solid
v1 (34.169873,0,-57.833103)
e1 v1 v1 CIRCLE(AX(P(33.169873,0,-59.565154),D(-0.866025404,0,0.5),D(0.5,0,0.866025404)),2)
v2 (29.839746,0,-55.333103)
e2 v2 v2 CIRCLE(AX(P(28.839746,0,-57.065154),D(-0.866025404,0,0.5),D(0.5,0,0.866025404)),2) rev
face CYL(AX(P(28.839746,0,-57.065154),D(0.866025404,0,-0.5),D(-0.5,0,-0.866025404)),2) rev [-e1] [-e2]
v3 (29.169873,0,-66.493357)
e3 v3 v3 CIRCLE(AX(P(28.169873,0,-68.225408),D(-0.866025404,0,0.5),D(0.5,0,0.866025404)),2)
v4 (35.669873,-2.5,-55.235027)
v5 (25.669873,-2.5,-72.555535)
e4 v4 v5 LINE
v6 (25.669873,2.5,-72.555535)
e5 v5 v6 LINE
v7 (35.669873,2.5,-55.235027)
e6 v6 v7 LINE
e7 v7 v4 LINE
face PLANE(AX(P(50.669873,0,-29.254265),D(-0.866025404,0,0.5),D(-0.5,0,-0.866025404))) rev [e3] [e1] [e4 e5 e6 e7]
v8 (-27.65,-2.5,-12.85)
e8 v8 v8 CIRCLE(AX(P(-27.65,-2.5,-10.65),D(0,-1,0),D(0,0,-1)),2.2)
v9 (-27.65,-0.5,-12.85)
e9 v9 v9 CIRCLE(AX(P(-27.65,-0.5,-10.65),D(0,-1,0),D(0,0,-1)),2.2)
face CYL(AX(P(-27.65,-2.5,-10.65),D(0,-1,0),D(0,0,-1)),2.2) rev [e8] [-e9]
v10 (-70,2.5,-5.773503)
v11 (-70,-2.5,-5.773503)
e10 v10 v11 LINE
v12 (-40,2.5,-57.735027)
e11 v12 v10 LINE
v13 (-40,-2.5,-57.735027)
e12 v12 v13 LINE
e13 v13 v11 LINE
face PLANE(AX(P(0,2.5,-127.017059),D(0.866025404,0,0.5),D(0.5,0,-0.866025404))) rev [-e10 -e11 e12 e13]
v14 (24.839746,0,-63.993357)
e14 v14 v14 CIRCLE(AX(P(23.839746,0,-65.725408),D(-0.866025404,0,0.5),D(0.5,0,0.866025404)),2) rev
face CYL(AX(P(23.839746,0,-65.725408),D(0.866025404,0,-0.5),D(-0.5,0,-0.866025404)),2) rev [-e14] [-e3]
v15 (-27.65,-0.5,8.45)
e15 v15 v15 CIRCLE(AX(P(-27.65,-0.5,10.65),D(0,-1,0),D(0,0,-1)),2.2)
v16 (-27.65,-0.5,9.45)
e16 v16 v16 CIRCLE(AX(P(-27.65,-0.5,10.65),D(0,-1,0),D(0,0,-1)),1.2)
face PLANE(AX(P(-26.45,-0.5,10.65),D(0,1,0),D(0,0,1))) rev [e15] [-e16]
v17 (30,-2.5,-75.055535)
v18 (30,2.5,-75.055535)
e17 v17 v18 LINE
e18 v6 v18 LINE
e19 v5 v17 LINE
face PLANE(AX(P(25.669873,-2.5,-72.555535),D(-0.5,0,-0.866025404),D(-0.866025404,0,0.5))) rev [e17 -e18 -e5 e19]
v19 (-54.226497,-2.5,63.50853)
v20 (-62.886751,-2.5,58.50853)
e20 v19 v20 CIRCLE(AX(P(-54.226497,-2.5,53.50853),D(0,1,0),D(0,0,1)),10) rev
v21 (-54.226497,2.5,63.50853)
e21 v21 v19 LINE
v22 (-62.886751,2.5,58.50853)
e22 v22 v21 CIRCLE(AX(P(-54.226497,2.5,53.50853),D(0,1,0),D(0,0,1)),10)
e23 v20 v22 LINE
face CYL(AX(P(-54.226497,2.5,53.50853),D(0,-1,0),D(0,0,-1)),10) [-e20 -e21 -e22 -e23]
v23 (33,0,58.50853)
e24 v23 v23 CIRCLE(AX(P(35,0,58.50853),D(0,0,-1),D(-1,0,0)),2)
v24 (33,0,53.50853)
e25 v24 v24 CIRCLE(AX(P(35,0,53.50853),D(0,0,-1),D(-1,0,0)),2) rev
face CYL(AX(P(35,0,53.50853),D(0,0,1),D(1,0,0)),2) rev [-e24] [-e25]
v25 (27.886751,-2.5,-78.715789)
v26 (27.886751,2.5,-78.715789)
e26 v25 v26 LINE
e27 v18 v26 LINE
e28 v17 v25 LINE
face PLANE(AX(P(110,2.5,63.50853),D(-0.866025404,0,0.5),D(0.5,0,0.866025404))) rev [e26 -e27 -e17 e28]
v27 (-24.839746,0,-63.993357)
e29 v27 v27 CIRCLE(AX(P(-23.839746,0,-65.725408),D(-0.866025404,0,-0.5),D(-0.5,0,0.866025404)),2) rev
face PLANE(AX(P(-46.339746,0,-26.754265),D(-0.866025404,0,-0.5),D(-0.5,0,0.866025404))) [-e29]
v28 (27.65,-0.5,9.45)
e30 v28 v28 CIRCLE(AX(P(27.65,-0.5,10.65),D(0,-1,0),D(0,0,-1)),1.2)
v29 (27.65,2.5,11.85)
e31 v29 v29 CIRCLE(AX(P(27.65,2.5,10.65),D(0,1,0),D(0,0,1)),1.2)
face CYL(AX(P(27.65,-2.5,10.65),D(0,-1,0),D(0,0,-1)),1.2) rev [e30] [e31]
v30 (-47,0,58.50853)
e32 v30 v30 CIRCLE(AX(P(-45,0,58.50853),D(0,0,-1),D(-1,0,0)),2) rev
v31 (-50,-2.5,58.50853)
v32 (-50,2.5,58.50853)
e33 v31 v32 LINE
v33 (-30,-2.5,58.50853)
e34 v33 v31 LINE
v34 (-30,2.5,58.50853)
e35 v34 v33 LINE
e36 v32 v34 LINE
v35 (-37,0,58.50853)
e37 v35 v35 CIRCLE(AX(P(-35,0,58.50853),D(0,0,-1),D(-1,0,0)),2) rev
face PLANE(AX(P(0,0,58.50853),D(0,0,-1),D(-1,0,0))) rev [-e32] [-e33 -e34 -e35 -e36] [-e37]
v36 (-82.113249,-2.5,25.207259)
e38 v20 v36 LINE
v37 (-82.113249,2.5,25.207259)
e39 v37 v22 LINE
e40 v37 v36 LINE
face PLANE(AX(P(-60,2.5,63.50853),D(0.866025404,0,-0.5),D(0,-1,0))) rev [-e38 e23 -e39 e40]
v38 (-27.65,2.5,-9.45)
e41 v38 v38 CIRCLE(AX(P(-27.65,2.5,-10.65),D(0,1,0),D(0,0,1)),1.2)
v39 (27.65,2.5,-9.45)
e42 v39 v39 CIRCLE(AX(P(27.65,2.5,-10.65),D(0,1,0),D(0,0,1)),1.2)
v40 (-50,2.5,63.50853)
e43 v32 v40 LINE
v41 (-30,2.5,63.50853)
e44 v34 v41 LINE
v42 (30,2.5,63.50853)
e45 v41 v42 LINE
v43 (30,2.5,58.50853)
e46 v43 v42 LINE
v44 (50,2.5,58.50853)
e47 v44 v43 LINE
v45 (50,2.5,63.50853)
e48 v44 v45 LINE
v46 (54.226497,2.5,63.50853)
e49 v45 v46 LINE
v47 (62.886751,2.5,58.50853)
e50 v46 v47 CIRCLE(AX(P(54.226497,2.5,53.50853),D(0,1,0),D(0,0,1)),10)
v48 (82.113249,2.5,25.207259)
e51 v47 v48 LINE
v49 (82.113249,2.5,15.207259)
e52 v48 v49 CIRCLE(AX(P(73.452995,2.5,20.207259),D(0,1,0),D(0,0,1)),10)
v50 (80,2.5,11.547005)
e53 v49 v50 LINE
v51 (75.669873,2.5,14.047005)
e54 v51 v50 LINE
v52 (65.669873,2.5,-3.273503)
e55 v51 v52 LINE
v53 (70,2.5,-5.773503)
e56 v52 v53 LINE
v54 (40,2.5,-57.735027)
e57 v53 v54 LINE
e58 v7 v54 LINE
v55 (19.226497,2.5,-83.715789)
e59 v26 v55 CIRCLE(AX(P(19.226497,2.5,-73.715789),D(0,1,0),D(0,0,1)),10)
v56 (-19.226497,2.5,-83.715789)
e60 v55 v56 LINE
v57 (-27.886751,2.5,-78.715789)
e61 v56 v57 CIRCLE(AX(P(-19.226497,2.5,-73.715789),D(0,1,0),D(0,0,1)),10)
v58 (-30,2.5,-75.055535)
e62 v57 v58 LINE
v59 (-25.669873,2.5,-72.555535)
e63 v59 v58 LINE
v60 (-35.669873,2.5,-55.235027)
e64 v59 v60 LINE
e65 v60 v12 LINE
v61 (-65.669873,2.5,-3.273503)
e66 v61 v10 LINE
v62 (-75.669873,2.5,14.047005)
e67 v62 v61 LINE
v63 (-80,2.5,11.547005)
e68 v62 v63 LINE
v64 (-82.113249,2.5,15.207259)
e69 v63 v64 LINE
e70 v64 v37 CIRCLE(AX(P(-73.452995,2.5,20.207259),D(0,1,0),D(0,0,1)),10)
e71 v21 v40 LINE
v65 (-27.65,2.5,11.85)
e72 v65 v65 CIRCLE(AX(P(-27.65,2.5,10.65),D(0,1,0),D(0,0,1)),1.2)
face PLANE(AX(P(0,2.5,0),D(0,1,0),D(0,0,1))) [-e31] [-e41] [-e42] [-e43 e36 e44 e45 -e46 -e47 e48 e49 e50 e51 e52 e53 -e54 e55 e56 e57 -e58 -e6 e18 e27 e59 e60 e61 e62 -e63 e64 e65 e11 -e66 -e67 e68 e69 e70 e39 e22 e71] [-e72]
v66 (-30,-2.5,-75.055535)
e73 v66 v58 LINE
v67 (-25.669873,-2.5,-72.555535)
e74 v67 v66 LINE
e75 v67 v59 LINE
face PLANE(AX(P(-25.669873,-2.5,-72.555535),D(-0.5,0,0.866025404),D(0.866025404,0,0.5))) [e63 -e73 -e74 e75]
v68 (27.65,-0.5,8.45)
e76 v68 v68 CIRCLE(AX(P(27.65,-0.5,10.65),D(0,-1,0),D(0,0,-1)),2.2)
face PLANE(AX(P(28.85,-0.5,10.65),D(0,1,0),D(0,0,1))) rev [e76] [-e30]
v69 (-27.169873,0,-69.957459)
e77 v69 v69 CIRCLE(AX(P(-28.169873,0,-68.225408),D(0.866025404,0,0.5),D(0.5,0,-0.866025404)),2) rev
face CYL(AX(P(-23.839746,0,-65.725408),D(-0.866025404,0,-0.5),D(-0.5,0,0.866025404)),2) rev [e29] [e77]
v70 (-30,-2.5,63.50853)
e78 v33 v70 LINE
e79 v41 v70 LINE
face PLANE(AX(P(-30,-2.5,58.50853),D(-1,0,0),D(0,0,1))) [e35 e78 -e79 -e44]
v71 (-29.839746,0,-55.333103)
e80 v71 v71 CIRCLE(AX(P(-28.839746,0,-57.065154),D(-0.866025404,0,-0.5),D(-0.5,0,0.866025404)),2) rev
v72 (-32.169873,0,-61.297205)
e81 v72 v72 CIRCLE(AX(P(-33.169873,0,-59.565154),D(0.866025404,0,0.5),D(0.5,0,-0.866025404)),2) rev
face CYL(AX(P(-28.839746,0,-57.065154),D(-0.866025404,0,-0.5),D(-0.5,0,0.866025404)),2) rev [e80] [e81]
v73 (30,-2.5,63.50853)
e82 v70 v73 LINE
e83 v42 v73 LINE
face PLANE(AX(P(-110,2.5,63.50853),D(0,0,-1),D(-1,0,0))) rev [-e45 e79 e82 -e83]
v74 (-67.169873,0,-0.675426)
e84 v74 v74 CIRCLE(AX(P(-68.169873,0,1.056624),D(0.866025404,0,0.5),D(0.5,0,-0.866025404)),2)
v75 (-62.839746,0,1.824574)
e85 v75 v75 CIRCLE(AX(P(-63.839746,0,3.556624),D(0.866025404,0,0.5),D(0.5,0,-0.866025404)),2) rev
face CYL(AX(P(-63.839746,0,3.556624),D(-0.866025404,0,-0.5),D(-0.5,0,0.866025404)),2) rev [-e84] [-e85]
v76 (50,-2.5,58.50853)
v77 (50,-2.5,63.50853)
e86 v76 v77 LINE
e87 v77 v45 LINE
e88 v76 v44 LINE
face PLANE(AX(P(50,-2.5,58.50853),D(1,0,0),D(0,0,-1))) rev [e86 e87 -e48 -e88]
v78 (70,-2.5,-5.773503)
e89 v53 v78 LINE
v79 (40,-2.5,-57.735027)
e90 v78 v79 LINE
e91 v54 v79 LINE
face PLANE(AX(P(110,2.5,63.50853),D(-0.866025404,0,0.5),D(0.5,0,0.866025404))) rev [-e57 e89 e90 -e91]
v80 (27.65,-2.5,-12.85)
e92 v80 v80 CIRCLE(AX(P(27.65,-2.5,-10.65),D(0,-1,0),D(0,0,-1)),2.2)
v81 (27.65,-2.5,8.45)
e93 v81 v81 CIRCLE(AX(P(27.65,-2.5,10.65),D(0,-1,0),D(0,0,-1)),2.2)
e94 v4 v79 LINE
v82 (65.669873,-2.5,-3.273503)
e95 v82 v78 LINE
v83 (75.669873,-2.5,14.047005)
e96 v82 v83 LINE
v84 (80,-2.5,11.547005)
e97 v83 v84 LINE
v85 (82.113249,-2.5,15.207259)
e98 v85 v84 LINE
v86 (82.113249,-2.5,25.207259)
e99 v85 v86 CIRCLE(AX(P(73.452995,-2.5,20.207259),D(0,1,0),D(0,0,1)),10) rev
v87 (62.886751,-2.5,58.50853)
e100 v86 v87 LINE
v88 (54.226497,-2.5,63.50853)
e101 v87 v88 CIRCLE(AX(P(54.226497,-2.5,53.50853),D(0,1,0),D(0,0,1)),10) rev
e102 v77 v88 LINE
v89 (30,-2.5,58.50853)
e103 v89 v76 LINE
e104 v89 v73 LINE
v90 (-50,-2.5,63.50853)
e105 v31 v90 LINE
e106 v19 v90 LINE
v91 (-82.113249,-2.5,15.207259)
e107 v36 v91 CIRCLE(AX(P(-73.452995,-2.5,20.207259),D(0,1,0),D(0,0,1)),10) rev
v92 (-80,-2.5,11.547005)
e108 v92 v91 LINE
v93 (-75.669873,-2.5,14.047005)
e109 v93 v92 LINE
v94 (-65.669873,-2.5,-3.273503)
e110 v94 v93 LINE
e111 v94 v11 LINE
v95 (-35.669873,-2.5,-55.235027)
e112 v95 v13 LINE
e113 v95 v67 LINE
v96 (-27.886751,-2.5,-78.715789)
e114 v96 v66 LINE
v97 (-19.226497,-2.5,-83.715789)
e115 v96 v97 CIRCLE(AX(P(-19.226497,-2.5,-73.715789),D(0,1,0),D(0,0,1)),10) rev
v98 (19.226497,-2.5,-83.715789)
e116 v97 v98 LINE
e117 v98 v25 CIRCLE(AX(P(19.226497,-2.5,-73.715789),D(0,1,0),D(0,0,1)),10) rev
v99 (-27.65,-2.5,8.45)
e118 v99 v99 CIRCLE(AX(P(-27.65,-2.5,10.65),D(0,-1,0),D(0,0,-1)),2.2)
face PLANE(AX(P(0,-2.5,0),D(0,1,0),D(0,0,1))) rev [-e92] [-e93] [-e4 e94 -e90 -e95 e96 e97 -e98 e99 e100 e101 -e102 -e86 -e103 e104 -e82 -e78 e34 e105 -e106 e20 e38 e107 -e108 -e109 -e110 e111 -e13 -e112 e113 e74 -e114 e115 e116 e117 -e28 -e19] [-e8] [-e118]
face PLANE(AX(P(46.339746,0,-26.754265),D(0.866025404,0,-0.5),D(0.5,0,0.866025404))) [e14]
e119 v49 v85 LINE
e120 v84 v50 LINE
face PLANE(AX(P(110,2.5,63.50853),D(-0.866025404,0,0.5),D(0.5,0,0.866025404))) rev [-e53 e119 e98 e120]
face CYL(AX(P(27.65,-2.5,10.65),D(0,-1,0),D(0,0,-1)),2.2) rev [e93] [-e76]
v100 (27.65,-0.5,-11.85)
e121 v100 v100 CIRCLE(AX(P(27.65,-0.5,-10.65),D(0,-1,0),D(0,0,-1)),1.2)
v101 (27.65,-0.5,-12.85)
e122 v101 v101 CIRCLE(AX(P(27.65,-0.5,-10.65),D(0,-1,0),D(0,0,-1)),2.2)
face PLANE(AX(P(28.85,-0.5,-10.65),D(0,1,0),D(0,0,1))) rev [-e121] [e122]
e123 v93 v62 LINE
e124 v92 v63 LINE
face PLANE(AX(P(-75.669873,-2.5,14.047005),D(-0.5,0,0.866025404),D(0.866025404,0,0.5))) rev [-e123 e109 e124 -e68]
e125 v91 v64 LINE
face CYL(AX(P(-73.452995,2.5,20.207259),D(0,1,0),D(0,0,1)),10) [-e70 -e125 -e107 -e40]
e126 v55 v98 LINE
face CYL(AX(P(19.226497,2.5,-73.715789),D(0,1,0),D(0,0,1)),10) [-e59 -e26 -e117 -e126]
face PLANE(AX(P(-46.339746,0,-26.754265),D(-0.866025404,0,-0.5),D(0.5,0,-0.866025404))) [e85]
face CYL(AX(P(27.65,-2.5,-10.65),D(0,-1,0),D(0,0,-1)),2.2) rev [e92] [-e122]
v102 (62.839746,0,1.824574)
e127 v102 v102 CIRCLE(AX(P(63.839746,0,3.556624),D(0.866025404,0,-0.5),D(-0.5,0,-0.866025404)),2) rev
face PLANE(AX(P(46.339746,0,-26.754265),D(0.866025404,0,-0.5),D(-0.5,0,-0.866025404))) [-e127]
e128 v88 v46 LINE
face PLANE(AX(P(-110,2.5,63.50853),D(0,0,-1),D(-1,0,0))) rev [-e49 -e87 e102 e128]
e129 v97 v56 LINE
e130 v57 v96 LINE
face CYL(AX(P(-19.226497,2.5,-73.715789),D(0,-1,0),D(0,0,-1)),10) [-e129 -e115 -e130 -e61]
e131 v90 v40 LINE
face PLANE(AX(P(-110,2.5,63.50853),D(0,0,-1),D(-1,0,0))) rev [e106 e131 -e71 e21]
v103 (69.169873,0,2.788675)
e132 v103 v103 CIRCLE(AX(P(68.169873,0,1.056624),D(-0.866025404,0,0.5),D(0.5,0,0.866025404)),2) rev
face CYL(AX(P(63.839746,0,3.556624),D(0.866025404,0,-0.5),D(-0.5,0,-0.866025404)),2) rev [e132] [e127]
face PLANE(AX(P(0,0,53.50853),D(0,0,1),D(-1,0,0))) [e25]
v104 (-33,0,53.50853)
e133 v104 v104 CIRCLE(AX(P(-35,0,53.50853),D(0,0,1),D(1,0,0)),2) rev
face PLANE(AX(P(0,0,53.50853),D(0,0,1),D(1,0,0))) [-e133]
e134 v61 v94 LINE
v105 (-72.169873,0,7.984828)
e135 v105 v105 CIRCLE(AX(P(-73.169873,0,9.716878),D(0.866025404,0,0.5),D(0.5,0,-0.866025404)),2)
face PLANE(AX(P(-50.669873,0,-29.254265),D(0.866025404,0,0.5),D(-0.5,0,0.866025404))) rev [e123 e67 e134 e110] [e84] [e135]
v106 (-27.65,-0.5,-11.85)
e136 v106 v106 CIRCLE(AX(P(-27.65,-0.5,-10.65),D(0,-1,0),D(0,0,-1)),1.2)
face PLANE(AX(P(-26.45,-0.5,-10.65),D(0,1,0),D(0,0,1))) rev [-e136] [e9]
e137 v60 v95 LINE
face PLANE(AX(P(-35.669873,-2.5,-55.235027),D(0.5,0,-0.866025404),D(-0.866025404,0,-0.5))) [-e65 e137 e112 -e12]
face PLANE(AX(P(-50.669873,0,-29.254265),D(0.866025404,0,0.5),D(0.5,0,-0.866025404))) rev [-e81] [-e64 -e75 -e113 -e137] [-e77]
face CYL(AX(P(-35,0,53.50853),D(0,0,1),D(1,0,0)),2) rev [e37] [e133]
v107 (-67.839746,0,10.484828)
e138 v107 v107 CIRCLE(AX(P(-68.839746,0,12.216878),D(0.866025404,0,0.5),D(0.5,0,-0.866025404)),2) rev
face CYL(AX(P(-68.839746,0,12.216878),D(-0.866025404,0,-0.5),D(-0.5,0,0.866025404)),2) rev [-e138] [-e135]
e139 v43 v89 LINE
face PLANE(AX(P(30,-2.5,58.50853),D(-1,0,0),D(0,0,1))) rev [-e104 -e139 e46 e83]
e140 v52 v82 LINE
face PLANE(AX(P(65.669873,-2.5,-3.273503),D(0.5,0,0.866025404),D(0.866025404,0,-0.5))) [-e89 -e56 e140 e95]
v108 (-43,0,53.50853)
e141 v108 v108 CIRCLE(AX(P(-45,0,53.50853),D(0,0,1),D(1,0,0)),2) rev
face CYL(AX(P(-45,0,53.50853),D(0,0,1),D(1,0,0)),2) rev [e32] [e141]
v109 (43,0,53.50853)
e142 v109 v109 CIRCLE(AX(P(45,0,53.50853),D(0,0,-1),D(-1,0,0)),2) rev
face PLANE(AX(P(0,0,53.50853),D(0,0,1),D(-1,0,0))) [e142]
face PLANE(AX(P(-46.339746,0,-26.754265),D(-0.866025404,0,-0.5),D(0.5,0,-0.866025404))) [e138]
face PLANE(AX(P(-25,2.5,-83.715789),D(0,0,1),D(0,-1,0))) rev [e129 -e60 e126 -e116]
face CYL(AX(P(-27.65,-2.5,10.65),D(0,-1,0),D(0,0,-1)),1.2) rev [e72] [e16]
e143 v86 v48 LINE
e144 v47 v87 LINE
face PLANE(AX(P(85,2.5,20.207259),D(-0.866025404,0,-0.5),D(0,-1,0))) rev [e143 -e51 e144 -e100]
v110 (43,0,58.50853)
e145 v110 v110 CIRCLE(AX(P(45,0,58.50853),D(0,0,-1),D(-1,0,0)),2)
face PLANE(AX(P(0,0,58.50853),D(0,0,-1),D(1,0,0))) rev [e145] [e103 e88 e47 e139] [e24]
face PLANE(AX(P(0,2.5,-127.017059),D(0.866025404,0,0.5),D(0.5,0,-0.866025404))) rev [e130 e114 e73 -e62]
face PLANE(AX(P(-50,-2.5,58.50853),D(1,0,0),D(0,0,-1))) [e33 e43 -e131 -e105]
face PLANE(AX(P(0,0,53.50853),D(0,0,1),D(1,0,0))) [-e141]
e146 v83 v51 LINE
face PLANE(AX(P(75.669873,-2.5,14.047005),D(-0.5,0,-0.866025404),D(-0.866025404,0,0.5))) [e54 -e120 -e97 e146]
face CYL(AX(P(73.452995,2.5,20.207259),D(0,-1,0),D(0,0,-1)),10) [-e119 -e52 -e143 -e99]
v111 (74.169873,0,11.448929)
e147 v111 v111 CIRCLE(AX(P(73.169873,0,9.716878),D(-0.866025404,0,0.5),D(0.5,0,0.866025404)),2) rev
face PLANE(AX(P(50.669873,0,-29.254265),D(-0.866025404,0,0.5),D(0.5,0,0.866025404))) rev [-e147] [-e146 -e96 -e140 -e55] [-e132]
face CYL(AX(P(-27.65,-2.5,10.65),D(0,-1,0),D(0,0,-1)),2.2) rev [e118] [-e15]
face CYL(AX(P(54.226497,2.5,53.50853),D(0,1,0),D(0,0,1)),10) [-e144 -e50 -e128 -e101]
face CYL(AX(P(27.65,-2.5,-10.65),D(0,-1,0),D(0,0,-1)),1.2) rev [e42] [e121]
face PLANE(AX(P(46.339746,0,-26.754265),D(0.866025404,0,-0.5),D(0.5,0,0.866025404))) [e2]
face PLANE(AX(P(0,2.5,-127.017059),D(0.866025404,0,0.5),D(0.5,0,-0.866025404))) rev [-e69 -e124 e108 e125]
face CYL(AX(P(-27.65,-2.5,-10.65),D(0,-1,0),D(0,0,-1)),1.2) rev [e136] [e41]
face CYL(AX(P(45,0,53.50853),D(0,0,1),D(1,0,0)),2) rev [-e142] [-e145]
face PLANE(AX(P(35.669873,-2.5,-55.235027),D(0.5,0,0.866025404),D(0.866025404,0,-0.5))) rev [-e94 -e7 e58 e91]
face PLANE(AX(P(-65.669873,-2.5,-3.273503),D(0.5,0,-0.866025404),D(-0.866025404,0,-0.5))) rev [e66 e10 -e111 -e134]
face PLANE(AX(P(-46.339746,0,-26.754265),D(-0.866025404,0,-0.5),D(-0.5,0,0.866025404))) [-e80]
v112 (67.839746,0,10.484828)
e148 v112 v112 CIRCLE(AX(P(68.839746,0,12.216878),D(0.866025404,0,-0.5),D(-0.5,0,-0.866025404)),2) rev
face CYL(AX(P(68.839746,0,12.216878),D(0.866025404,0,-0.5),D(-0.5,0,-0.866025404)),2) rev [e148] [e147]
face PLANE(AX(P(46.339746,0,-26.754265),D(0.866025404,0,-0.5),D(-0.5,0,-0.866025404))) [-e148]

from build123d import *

# Parameters (mm, degrees)
BOSS_EXTRUDE1_DEPTH            = 2.5
CHAMFER1_SIZE                  = 50
SKETCH4_W                      = 20
SKETCH4_H                      = 5
SKETCH4_R                      = 2
CUT_EXTRUDE1_DEPTH             = 5
SKETCH4_2_R                    = 2
CUT_EXTRUDE2_DEPTH             = 10
CRVPATTERN1_START              = -63.508529611
CRVPATTERN1_OUTLINE_W          = 20
CRVPATTERN1_OUTLINE_H          = 5
CRVPATTERN1_DEPTH              = 5
CRVPATTERN1_START_2            = -58.508529611
CRVPATTERN1_2_OUTLINE_R        = 2
CRVPATTERN1_2_DEPTH            = 5
CRVPATTERN1_START_3            = 58.508529611
CRVPATTERN1_3_OUTLINE_W        = 20
CRVPATTERN1_3_OUTLINE_H        = 5
CRVPATTERN1_3_DEPTH            = 5
CRVPATTERN1_START_4            = 53.508529611
CRVPATTERN1_4_OUTLINE_R        = 2
CRVPATTERN1_4_DEPTH            = 5
FILLET1_R                      = 10
CBORE_FOR_M2_SHCS1_D           = 2.4
CBORE_FOR_M2_SHCS1_CBORE_D     = 4.4
CBORE_FOR_M2_SHCS1_CBORE_DEPTH = 2


# Read off the part's stored shape, not the designer's step: CrvPattern1
with BuildPart() as part:
    # Sketch1 → Boss-Extrude1 (new, symmetric)
    with BuildSketch(Plane(origin=(0, 0, 0), x_dir=(1, 0, 0), z_dir=(0, 1, 0))):
        Polygon((110, -63.508529611), (0, 127.017059222), (-110, -63.508529611), align=None)
    extrude(amount=BOSS_EXTRUDE1_DEPTH, both=True)

    # Chamfer1
    chamfer1_edges = [part.edges().sort_by_distance(p)[0] for p in [
        (-110, 0, 63.508529611),
        (0, 0, -127.017059222),
        (110, 0, 63.508529611),
    ]]
    chamfer(chamfer1_edges, length=CHAMFER1_SIZE)

    # Sketch4 → Cut-Extrude1 (cut)
    with BuildSketch(Plane(origin=(4.375288244, 0, 63.508529611), x_dir=(-1, 0, 0), z_dir=(0, 0, -1))):
        with Locations((44.375288244, 0)):
            Rectangle(SKETCH4_W, SKETCH4_H)
        with Locations((39.375288244, 0)):
            Circle(SKETCH4_R, mode=Mode.SUBTRACT)
        with Locations((49.375288244, 0)):
            Circle(SKETCH4_R, mode=Mode.SUBTRACT)
    cut_extrude1 = extrude(amount=CUT_EXTRUDE1_DEPTH, mode=Mode.SUBTRACT)

    # Sketch4<2> → Cut-Extrude2 (cut)
    with BuildSketch(Plane(origin=(4.375288244, 0, 63.508529611), x_dir=(-1, 0, 0), z_dir=(0, 0, -1))):
        with Locations(Location((49.375288244, 0, 0), (0, 0, 180))):
            Circle(SKETCH4_2_R)
        with Locations(Location((39.375288244, 0, 0), (0, 0, 180))):
            Circle(SKETCH4_2_R)
    cut_extrude2 = extrude(amount=CUT_EXTRUDE2_DEPTH, mode=Mode.SUBTRACT)

    # Mirror1: Cut-Extrude1, Cut-Extrude2 across plane
    add(cut_extrude1.mirror(Plane(origin=(0, 0, 0), x_dir=(0, 0, 1), z_dir=(1, 0, 0))), mode=Mode.SUBTRACT)
    add(cut_extrude2.mirror(Plane(origin=(0, 0, 0), x_dir=(0, 0, 1), z_dir=(1, 0, 0))), mode=Mode.SUBTRACT)

    # CrvPattern1 outline → CrvPattern1 (cut)
    with BuildSketch(Plane(origin=(0, 0, 0), x_dir=(0.499999999999987, 0, -0.8660254037844463), z_dir=(0.8660254037844461, 0, 0.49999999999998707)).offset(CRVPATTERN1_START)):
        with Locations((-40, 0)):
            Rectangle(CRVPATTERN1_OUTLINE_W, CRVPATTERN1_OUTLINE_H)
        with Locations((40, 0)):
            Rectangle(CRVPATTERN1_OUTLINE_W, CRVPATTERN1_OUTLINE_H)
    extrude(amount=CRVPATTERN1_DEPTH, mode=Mode.SUBTRACT)

    # CrvPattern1 2 outline → CrvPattern1 2 (cut)
    with BuildSketch(Plane(origin=(0, 0, 0), x_dir=(0.499999999999987, 0, -0.8660254037844463), z_dir=(0.8660254037844461, 0, 0.49999999999998707)).offset(CRVPATTERN1_START_2)):
        with Locations((-35, 0)):
            Circle(CRVPATTERN1_2_OUTLINE_R)
        with Locations((-45, 0)):
            Circle(CRVPATTERN1_2_OUTLINE_R)
        with Locations((35, 0)):
            Circle(CRVPATTERN1_2_OUTLINE_R)
        with Locations((45, 0)):
            Circle(CRVPATTERN1_2_OUTLINE_R)
    extrude(amount=CRVPATTERN1_2_DEPTH, mode=Mode.SUBTRACT)

    # CrvPattern1 3 outline → CrvPattern1 3 (cut)
    with BuildSketch(Plane(origin=(0, 0, 0), x_dir=(0.500000000000001, 0, 0.866025403784438), z_dir=(0.866025403784438, 0, -0.500000000000001)).offset(CRVPATTERN1_START_3)):
        with Locations((-40, 0)):
            Rectangle(CRVPATTERN1_3_OUTLINE_W, CRVPATTERN1_3_OUTLINE_H)
        with Locations((40, 0)):
            Rectangle(CRVPATTERN1_3_OUTLINE_W, CRVPATTERN1_3_OUTLINE_H)
    extrude(amount=CRVPATTERN1_3_DEPTH, mode=Mode.SUBTRACT)

    # CrvPattern1 4 outline → CrvPattern1 4 (cut)
    with BuildSketch(Plane(origin=(0, 0, 0), x_dir=(0.500000000000001, 0, 0.866025403784438), z_dir=(0.866025403784438, 0, -0.500000000000001)).offset(CRVPATTERN1_START_4)):
        with Locations((-35, 0)):
            Circle(CRVPATTERN1_4_OUTLINE_R)
        with Locations((-45, 0)):
            Circle(CRVPATTERN1_4_OUTLINE_R)
        with Locations((35, 0)):
            Circle(CRVPATTERN1_4_OUTLINE_R)
        with Locations((45, 0)):
            Circle(CRVPATTERN1_4_OUTLINE_R)
    extrude(amount=CRVPATTERN1_4_DEPTH, mode=Mode.SUBTRACT)

    # Fillet1
    fillet1_edges = [part.edges().sort_by_distance(p)[0] for p in [
        (60, 0, 63.508529611),
        (-60, 0, 63.508529611),
        (-25, 0, -83.715789032),
        (-85, 0, 20.207259422),
        (25, 0, -83.715789032),
        (85, 0, 20.207259422),
    ]]
    fillet(fillet1_edges, radius=FILLET1_R)

    # CBORE for M2 SHCS1 (through all)
    with Locations(Plane(origin=(0, -2.5, 0), x_dir=(-1, 0, 0), z_dir=(0, -1, 0))):
        with Locations((-27.65, -10.65), (27.65, 10.65), (27.65, -10.65), (-27.65, 10.65)):
            CounterBoreHole(CBORE_FOR_M2_SHCS1_D / 2, CBORE_FOR_M2_SHCS1_CBORE_D / 2, CBORE_FOR_M2_SHCS1_CBORE_DEPTH)


solid = part.part
